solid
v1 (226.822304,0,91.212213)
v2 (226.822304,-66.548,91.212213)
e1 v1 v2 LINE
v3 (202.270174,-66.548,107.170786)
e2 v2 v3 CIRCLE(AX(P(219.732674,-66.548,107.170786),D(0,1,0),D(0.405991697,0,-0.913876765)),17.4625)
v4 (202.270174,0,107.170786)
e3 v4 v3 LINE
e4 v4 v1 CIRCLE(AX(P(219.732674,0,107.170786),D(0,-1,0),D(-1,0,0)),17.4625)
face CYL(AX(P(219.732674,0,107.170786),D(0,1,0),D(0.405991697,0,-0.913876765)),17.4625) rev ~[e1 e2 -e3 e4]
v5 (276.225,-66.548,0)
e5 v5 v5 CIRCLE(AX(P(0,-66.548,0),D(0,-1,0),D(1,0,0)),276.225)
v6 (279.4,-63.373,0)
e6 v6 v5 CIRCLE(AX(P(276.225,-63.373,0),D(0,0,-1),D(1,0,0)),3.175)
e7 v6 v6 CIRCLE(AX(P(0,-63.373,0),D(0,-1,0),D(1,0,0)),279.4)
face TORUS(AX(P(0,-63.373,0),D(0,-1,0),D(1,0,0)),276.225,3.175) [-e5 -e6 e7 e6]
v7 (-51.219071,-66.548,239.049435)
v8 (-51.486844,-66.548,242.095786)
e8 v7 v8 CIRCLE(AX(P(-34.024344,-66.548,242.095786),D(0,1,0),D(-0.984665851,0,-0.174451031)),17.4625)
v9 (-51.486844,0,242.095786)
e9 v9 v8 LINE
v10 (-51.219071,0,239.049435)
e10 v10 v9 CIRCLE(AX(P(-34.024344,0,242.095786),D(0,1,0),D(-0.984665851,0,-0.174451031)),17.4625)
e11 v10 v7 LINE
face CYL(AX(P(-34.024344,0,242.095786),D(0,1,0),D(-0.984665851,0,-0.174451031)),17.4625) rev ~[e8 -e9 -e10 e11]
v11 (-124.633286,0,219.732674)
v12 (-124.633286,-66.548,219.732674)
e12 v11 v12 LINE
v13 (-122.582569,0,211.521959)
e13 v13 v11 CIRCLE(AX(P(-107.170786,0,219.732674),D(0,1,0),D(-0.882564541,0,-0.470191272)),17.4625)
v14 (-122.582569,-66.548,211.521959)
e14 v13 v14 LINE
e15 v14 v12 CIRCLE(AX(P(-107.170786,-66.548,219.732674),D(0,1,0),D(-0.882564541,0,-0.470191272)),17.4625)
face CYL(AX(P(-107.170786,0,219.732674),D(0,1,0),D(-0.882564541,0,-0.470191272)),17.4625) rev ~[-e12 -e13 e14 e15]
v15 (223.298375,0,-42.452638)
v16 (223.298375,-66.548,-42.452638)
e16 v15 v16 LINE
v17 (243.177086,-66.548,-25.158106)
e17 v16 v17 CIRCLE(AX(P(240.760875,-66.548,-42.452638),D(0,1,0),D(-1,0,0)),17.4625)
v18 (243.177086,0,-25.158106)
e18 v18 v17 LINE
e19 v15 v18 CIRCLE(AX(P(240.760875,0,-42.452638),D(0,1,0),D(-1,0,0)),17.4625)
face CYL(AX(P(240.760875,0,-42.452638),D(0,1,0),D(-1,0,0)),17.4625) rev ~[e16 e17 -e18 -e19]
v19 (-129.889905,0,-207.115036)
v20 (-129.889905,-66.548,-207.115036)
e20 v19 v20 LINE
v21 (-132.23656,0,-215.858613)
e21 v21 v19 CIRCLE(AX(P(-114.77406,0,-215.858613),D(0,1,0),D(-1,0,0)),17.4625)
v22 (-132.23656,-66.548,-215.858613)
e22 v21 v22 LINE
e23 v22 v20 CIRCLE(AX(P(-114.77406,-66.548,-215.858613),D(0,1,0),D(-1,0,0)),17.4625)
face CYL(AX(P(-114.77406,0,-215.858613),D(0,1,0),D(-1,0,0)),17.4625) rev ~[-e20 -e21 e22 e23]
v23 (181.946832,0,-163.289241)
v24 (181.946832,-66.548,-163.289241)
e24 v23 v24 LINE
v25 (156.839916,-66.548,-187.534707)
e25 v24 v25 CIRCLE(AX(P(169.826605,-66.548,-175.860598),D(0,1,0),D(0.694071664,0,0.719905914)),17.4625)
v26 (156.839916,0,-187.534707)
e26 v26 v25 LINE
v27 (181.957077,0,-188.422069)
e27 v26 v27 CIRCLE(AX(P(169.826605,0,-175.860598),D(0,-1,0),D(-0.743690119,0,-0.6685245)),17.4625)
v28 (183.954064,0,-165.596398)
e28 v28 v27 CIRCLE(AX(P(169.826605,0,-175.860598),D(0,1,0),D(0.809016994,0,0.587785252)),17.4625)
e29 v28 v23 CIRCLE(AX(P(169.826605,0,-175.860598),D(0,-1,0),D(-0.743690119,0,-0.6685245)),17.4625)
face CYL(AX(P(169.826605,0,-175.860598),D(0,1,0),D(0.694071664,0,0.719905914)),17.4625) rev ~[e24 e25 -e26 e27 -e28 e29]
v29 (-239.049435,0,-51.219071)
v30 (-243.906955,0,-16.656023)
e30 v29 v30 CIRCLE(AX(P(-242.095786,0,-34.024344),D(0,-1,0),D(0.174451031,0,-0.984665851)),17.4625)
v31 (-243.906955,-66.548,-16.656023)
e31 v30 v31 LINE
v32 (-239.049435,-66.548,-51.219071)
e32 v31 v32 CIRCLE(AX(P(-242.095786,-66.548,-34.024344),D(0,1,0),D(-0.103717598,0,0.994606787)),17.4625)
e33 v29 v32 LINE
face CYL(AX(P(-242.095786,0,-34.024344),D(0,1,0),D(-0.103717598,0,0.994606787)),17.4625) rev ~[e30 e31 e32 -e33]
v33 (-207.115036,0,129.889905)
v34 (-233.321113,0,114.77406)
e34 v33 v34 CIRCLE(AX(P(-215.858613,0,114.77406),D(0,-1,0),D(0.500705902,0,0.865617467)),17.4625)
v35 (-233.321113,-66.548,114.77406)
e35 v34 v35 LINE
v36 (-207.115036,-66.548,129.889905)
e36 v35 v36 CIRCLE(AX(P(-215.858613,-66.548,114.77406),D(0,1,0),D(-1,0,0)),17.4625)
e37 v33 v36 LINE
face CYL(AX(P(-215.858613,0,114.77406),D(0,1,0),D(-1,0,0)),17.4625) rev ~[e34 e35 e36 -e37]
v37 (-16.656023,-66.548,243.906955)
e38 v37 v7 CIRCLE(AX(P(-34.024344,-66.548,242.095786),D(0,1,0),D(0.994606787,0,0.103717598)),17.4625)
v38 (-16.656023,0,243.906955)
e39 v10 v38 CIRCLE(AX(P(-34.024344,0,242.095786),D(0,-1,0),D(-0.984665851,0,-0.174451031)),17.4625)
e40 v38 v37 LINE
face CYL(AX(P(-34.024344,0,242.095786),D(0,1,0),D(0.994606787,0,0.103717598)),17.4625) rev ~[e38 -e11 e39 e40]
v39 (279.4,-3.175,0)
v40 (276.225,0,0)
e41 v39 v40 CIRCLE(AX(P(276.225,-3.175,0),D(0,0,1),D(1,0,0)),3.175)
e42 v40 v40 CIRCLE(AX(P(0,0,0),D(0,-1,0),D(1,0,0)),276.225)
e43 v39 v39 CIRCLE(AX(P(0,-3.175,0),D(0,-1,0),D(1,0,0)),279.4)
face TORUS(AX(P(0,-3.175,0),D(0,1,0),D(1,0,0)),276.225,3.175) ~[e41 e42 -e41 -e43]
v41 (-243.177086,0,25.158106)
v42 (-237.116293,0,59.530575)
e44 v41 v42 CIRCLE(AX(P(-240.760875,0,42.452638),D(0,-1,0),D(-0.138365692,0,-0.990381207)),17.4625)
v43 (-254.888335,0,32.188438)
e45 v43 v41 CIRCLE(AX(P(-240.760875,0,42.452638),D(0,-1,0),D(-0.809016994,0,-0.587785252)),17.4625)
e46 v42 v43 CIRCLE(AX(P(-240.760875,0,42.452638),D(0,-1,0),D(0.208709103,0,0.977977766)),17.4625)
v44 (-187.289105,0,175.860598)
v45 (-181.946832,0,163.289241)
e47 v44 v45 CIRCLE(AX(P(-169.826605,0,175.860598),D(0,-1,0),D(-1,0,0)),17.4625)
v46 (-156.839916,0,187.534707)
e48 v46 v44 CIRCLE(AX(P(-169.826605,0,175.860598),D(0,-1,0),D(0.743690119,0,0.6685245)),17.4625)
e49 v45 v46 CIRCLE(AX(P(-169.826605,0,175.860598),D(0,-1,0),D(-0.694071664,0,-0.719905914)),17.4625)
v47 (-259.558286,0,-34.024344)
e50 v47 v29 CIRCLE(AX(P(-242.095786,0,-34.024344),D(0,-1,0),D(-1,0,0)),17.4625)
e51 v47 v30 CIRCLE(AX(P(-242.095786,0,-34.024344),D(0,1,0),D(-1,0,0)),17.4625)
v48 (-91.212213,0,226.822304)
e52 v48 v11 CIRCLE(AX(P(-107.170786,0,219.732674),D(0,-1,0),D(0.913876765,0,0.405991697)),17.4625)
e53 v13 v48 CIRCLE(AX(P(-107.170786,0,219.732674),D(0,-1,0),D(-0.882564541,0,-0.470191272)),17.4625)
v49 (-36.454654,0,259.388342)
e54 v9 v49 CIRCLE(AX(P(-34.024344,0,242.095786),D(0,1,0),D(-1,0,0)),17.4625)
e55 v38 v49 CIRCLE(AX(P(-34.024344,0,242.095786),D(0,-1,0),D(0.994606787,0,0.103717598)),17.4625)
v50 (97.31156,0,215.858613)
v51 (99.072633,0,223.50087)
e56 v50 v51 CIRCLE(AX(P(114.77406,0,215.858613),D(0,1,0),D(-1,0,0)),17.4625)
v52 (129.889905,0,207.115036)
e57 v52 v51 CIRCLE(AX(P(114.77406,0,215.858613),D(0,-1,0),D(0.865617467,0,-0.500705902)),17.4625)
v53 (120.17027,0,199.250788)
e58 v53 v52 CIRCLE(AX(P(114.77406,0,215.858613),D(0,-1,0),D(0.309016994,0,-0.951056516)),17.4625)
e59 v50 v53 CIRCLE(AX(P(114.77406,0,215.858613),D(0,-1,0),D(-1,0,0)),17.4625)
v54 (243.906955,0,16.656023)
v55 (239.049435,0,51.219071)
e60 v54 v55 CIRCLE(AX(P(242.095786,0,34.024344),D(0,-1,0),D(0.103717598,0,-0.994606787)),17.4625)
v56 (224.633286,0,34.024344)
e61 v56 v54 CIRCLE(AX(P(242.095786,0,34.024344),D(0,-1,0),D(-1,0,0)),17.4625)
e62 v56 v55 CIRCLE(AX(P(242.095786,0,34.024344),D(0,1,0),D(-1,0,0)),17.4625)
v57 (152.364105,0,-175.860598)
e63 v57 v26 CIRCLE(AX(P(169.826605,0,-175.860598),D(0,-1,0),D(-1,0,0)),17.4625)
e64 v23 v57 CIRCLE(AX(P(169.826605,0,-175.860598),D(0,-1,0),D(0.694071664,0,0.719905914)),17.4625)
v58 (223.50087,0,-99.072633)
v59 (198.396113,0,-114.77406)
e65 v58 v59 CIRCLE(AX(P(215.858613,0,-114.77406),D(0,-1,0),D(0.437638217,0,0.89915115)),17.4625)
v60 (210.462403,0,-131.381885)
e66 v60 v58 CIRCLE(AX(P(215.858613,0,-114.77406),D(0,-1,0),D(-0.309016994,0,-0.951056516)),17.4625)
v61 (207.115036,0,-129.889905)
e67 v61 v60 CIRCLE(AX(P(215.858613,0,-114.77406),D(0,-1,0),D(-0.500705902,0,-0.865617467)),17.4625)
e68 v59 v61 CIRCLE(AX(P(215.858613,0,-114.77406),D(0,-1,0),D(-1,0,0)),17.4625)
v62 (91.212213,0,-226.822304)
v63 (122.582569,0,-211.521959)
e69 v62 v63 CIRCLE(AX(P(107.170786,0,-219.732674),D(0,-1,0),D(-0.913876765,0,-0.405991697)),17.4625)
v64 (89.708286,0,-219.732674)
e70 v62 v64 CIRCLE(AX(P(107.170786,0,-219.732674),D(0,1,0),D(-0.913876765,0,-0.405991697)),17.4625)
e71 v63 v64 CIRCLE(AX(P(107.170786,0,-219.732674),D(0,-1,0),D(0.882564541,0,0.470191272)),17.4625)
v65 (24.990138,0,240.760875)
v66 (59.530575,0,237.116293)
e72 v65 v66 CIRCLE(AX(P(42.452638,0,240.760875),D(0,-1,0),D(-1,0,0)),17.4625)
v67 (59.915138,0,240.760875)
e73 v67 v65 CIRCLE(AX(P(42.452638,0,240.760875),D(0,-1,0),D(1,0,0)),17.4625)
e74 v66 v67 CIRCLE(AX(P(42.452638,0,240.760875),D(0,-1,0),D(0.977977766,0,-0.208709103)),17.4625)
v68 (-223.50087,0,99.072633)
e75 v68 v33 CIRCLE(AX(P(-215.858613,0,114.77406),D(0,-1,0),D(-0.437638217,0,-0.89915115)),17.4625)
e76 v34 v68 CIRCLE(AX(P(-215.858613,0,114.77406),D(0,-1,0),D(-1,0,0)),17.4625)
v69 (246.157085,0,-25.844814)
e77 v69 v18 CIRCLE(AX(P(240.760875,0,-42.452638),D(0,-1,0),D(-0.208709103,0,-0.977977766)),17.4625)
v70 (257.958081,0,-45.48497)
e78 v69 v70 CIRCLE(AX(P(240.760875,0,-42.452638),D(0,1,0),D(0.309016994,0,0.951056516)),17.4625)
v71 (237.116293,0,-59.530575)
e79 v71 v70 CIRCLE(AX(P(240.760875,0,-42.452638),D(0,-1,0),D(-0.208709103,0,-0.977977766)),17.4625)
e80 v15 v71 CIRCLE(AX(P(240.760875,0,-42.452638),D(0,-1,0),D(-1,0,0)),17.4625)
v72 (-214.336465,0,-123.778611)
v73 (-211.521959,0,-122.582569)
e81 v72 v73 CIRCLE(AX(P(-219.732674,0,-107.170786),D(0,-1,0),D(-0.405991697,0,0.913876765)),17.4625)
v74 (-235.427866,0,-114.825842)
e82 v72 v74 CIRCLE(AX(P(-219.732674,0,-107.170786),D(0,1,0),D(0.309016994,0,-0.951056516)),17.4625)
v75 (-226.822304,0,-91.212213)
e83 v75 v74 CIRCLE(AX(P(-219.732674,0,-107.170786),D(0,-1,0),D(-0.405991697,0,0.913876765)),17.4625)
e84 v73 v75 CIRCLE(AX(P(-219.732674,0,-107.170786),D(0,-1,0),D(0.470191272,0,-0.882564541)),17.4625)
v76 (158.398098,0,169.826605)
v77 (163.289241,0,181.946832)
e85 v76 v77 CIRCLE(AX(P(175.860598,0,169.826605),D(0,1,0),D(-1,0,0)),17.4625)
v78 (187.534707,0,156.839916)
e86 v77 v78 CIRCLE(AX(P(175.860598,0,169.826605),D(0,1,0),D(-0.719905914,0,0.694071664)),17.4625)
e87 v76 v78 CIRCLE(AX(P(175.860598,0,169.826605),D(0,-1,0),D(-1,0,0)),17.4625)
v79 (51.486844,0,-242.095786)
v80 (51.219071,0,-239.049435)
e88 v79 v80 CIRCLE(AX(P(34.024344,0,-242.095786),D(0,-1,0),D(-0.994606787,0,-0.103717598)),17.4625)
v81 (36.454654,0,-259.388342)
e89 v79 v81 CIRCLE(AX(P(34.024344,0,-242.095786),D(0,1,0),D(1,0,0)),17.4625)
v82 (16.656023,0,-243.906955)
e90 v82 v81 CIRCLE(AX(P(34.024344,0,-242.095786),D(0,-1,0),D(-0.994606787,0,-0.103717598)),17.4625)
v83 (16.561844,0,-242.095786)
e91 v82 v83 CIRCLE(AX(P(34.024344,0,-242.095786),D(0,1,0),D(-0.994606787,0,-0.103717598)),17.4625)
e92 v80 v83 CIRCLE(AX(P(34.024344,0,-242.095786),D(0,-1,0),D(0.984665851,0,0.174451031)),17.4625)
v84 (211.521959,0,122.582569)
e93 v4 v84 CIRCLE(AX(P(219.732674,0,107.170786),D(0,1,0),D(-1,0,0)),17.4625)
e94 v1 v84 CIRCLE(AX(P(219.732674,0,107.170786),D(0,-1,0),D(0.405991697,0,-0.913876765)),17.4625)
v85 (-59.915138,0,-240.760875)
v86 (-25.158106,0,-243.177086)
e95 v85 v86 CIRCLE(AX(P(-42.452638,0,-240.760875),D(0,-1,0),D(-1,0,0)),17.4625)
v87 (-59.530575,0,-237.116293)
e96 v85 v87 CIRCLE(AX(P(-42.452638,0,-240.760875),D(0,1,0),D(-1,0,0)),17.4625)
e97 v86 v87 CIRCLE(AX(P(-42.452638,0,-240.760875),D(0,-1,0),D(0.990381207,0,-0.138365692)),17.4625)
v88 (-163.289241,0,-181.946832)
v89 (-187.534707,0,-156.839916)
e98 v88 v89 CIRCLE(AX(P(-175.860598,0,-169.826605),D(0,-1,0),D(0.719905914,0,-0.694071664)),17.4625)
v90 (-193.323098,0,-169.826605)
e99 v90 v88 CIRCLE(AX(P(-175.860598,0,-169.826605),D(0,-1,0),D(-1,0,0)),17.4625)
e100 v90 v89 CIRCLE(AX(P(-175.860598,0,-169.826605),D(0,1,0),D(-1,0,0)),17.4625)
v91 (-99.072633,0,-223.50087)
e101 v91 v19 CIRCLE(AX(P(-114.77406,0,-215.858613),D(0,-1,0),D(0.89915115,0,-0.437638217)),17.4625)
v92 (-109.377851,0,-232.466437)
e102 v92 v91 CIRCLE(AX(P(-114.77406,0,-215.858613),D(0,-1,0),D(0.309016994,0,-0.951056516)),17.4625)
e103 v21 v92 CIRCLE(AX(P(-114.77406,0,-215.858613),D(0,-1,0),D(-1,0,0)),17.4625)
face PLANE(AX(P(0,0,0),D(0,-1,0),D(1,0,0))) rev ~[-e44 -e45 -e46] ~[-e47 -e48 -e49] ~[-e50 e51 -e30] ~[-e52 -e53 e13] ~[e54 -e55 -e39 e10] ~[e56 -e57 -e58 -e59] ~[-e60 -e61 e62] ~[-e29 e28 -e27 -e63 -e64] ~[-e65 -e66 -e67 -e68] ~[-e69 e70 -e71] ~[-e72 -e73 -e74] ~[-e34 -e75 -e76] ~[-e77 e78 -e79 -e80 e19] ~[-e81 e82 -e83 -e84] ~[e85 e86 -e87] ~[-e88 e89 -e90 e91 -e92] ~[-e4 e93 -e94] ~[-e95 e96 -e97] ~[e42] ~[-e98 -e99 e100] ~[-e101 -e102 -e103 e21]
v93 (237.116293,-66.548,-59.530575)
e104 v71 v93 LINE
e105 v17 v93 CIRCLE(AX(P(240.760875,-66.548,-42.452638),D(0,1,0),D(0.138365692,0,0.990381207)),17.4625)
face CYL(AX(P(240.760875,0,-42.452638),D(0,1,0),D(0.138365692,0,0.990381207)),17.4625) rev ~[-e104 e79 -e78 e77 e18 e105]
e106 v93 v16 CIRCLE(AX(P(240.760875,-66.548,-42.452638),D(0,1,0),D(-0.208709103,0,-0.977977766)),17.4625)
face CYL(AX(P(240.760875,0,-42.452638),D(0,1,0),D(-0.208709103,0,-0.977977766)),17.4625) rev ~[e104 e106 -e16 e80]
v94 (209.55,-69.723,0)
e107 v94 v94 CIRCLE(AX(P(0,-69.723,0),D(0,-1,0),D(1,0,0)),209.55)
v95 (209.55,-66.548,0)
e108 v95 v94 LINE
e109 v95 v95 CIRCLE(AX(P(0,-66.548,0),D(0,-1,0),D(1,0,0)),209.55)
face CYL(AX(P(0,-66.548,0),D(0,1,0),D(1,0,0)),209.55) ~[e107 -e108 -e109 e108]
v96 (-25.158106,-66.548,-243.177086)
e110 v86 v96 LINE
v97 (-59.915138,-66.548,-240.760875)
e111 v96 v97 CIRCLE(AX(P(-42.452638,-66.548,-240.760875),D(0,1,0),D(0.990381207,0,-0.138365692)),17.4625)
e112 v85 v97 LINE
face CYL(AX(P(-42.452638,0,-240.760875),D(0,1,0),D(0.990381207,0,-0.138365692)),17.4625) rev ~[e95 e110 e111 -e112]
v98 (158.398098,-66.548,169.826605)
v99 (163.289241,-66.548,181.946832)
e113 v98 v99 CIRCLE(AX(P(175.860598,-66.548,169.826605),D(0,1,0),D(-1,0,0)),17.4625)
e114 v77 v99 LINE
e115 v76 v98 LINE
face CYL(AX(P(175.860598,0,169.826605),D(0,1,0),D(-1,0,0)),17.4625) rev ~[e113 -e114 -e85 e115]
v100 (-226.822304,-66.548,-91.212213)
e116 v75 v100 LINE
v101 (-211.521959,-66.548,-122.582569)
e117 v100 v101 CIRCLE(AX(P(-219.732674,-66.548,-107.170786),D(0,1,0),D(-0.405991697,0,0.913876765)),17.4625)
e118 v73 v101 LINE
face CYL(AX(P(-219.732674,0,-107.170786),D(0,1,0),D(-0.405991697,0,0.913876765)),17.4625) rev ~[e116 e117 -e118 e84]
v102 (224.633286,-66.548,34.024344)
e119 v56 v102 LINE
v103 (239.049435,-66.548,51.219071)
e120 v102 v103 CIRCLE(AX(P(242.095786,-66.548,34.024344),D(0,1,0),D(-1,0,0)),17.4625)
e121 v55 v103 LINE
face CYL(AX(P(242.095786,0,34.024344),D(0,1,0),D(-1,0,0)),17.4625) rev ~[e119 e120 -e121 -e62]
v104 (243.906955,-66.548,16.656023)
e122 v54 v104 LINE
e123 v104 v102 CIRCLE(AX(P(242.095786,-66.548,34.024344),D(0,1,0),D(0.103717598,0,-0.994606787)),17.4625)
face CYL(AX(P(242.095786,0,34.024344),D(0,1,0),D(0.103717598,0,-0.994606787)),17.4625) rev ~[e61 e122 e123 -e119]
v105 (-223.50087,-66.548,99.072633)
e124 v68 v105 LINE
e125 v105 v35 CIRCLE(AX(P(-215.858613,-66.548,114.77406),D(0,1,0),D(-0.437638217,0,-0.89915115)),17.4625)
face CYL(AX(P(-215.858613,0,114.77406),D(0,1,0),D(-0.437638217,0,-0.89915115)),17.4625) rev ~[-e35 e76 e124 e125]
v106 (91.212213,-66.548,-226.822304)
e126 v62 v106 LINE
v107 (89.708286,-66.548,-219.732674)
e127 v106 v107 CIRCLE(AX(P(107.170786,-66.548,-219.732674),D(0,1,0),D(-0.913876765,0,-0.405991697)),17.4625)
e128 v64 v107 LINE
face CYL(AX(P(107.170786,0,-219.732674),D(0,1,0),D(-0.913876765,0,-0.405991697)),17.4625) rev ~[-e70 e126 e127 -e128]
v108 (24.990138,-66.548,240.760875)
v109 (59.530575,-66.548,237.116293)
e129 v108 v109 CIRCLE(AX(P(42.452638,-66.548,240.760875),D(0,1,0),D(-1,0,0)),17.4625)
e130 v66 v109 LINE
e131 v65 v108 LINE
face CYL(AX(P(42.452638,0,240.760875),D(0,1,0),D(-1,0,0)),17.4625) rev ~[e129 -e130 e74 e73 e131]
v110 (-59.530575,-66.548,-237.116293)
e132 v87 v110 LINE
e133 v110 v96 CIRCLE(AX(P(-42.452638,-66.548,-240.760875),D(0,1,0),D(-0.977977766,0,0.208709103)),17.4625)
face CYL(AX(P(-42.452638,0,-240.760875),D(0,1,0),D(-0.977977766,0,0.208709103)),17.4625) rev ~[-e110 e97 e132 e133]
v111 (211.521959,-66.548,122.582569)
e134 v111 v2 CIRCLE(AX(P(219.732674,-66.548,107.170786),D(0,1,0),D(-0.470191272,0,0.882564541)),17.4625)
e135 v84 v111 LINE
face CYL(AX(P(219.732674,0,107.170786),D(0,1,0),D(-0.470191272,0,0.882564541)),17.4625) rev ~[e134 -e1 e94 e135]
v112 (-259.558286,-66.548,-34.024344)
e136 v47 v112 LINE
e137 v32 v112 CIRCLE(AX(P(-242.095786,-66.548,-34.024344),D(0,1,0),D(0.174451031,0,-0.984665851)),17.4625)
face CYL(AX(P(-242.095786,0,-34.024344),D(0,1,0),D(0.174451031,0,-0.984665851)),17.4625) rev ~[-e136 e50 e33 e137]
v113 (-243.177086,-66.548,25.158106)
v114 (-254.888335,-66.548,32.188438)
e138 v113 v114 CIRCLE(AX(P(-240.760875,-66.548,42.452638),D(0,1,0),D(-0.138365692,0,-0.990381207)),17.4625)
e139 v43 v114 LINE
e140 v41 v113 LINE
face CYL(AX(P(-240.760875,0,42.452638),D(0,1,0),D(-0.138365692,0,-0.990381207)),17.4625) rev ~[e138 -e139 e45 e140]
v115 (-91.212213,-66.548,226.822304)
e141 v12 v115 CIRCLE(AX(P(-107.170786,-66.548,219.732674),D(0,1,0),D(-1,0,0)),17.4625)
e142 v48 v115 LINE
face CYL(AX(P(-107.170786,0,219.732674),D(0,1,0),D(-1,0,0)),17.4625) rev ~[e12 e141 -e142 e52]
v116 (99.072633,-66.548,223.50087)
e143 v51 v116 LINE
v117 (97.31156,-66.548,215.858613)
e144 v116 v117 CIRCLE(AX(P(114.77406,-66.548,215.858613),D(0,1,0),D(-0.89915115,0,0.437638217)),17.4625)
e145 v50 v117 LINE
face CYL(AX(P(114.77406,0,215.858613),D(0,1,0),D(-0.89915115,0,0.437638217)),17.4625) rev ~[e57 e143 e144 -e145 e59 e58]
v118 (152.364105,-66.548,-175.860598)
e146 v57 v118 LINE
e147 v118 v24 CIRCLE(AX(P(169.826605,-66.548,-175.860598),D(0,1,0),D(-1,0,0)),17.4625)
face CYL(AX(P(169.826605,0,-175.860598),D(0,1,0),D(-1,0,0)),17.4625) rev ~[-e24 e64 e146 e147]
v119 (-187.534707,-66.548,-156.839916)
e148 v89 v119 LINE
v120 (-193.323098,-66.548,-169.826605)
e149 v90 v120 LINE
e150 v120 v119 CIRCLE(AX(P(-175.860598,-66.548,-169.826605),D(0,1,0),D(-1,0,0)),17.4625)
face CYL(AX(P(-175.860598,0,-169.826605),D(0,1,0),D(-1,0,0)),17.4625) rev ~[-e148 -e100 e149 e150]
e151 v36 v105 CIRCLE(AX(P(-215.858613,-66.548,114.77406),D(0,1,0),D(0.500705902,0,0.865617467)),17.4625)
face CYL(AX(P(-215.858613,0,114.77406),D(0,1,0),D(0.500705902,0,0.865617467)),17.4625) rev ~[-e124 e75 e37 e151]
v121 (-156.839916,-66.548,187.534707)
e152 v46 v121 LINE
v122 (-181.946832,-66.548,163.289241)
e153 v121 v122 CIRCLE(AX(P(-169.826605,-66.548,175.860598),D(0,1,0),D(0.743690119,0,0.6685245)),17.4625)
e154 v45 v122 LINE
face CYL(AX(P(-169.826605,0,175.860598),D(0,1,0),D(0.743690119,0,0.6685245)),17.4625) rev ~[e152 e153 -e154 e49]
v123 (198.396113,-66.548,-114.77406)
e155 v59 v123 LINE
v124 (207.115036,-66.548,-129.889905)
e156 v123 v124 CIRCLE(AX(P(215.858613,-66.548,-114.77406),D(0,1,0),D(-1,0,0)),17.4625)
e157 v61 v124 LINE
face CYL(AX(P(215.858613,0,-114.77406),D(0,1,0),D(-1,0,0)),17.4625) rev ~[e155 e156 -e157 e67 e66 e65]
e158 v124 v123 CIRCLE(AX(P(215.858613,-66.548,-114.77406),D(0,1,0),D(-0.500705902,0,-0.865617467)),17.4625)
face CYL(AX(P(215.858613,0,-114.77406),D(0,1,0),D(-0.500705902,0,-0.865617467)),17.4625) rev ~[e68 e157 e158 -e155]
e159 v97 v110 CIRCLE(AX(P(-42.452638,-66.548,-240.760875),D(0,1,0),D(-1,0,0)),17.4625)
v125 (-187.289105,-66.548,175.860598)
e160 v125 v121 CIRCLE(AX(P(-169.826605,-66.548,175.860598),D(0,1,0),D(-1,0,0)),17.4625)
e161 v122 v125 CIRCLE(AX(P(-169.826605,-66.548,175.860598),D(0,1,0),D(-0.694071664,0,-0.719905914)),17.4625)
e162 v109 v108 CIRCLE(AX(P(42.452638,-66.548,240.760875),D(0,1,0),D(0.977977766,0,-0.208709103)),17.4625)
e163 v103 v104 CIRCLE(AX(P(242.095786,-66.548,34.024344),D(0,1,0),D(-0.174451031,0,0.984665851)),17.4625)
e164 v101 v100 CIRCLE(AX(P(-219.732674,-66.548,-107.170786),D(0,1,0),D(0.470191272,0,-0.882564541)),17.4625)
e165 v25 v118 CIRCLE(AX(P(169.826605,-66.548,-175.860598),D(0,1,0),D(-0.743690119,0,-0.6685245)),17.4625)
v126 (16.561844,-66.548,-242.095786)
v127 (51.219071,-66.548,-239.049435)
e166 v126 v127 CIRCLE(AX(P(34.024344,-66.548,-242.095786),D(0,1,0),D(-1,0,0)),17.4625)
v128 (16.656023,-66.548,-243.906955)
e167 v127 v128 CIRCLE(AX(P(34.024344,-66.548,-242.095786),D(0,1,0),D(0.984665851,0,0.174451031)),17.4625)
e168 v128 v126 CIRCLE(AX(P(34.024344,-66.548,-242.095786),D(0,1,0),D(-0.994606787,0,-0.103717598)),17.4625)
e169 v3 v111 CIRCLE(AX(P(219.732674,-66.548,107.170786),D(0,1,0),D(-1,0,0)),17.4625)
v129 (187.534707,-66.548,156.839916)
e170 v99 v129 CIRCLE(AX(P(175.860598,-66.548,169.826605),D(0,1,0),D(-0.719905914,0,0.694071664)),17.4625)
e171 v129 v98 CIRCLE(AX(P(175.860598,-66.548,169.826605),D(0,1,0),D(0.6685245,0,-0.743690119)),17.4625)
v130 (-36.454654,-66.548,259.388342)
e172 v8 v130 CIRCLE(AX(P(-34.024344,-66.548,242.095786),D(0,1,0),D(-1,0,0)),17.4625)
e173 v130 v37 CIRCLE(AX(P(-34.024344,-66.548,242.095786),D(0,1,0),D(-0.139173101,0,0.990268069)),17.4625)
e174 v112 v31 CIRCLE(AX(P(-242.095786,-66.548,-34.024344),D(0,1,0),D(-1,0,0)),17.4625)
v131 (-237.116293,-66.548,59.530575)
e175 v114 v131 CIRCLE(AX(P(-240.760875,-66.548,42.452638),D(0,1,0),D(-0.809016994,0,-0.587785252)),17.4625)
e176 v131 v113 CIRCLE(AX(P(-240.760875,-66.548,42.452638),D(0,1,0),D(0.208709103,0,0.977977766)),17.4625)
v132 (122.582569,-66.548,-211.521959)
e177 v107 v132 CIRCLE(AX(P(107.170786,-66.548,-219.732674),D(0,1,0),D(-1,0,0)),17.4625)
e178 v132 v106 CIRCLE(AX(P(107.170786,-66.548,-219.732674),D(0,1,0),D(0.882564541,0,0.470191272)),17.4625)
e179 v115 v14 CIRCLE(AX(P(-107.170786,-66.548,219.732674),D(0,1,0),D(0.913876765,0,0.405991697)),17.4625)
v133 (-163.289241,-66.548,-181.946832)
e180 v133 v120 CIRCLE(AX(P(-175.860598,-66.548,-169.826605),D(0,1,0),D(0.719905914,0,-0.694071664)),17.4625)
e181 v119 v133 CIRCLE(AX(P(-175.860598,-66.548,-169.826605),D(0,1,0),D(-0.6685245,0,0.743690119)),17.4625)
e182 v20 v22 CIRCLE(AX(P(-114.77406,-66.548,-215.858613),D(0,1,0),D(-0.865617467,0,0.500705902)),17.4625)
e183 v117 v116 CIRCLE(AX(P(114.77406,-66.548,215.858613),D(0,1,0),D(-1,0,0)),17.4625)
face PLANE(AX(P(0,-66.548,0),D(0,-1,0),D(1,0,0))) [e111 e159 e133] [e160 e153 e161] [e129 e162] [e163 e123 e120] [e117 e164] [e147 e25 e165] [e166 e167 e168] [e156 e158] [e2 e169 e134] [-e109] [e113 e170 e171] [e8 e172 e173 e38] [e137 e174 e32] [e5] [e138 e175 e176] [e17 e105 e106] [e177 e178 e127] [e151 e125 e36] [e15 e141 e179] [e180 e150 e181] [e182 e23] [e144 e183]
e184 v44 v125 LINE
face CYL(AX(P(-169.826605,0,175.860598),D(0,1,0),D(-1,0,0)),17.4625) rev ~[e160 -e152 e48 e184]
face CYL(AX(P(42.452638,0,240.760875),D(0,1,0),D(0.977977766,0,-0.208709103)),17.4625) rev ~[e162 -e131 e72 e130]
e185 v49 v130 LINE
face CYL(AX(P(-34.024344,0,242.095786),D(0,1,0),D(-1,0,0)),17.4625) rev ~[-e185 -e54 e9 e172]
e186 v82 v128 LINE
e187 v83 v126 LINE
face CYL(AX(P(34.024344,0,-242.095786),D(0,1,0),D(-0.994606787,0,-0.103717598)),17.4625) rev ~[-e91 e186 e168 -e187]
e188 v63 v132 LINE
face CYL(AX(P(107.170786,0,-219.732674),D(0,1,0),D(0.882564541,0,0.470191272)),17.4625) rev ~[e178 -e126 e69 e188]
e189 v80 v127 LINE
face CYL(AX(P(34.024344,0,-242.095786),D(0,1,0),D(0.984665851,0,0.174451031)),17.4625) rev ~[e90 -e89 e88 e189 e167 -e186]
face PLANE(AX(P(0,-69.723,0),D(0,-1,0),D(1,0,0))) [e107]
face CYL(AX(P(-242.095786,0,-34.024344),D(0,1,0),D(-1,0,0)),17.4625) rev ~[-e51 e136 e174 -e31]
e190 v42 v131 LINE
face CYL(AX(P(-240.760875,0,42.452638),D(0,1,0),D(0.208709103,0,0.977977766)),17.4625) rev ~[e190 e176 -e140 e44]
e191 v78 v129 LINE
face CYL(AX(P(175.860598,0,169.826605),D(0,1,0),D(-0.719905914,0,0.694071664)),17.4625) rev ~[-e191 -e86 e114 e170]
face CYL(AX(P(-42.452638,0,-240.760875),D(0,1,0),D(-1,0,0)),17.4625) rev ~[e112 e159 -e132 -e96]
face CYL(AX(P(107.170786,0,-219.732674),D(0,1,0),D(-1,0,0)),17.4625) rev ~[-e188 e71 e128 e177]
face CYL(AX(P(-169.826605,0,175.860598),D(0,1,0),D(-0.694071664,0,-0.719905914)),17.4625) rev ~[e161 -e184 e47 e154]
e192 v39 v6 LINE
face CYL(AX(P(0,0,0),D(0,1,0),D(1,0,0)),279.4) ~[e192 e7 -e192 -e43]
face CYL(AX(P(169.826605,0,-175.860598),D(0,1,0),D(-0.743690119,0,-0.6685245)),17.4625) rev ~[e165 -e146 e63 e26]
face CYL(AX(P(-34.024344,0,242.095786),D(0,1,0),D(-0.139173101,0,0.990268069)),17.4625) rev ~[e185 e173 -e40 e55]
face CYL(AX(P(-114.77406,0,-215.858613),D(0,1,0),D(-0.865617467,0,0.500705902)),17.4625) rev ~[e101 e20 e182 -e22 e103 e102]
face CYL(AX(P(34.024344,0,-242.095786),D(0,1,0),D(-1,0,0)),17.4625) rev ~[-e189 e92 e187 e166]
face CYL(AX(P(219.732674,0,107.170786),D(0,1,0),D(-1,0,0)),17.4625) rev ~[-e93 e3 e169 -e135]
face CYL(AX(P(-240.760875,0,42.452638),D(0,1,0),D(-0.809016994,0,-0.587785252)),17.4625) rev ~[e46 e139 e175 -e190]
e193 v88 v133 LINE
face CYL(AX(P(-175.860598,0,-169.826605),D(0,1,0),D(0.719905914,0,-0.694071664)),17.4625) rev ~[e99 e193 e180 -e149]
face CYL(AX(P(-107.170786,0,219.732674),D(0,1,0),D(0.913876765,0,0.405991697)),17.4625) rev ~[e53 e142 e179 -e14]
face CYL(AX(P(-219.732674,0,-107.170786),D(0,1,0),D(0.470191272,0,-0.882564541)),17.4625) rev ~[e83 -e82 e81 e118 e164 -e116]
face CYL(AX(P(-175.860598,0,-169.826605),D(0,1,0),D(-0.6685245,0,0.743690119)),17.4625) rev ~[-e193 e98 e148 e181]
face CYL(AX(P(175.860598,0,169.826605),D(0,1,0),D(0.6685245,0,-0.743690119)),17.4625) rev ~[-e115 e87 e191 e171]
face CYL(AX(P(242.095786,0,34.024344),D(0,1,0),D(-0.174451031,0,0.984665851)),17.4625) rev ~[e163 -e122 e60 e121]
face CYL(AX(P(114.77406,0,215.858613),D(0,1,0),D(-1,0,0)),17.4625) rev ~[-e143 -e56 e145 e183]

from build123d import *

# Parameters (mm, degrees)
F0_R            = 279.4
F1_DEPTH        = 66.548
F2_R            = 3.175
F3_R            = 209.55
F4_DEPTH        = 3.175
F6_DEPTH        = 76.2
F6_COPIES_COUNT = 8
F6_COPIES_ANGLE = 252


# Not quite as in the source:
# - a pattern or mirror of a feature is missing from the dataset's text; its kind, count and spacing are read off the source's solid


with BuildPart() as f1:
    # F0 (on Front) → F1 (new body)
    with BuildSketch(Plane.XZ):
        Circle(F0_R)
    extrude(amount=F1_DEPTH)

    # F2
    f2_edges = [f1.edges().sort_by_distance(p)[0] for p in [
        (-279.4, -66.548, 0),
        (-279.4, 0, 0),
    ]]
    fillet(f2_edges, radius=F2_R)

    # F3 (on face) → F4 (join)
    with BuildSketch(Plane.XZ.offset(66.548)):
        Circle(F3_R)
    extrude(amount=F4_DEPTH)

    # F5 (on face) → F6 (cut)
    with BuildSketch(Plane(origin=(0, 0, 0), x_dir=(-1, 0, 0), z_dir=(0, 1, 0))):
        with BuildLine():
            ThreePointArc((259.5582861056, -34.0243438572), (255.0681882926, -22.3343614899), (243.9069546527, -16.6560228461))
            ThreePointArc((243.9069546527, -16.6560228461), (242.0957861056, -34.0243438572), (239.0494349763, -51.2190712772))
            ThreePointArc((239.0494349763, -51.2190712772), (253.31501067, -47.405969559), (259.5582861056, -34.0243438572))
        make_face()
        with BuildLine():
            ThreePointArc((239.0494349763, -51.2190712772), (242.0957861056, -34.0243438572), (243.9069546527, -16.6560228461))
            ThreePointArc((243.9069546527, -16.6560228461), (224.8032299552, -31.5940335817), (239.0494349763, -51.2190712772))
        make_face()
        with BuildLine():
            ThreePointArc((207.1150359511, 129.8899053352), (200.4401404239, 106.5759131469), (223.5008701244, 99.0726333486))
            ThreePointArc((223.5008701244, 99.0726333486), (215.8586127642, 114.7740603121), (207.1150359511, 129.8899053352))
        make_face()
        with BuildLine():
            ThreePointArc((207.1150359511, 129.8899053352), (215.8586127642, 114.7740603121), (223.5008701244, 99.0726333486))
            ThreePointArc((223.5008701244, 99.0726333486), (230.6638791482, 105.5143090439), (233.3211127642, 114.7740603121))
            ThreePointArc((233.3211127642, 114.7740603121), (224.5836971807, 129.9005869515), (207.1150359511, 129.8899053352))
        make_face()
        with BuildLine():
            ThreePointArc((237.195174469, -107.1707861113), (234.3740809966, -97.6540576217), (226.822304474, -91.2122130973))
            ThreePointArc((226.822304474, -91.2122130973), (219.732674469, -107.1707861113), (211.5219593902, -122.5825694002))
            ThreePointArc((211.5219593902, -122.5825694002), (228.7204243038, -122.142735188), (237.195174469, -107.1707861113))
        make_face()
        with BuildLine():
            ThreePointArc((211.5219593902, -122.5825694002), (219.732674469, -107.1707861113), (226.822304474, -91.2122130973))
            ThreePointArc((226.822304474, -91.2122130973), (204.0374834355, -99.5157299605), (211.5219593902, -122.5825694002))
        make_face()
        with BuildLine():
            ThreePointArc((156.8399164176, 187.5347067695), (157.6961333238, 163.2991264244), (181.9468315473, 163.2892406587))
            ThreePointArc((181.9468315473, 163.2892406587), (169.826605118, 175.8605976878), (156.8399164176, 187.5347067695))
        make_face()
        with BuildLine():
            ThreePointArc((156.8399164176, 187.5347067695), (169.826605118, 175.8605976878), (181.9468315473, 163.2892406587))
            ThreePointArc((181.9468315473, 163.2892406587), (185.8981383409, 169.03090325), (187.289105118, 175.8605976878))
            ThreePointArc((187.289105118, 175.8605976878), (176.0779591641, 192.1657955964), (156.8399164176, 187.5347067695))
        make_face()
        with BuildLine():
            ThreePointArc((193.3230976878, -169.826605118), (191.8104885352, -162.7174639458), (187.5347067695, -156.8399164176))
            ThreePointArc((187.5347067695, -156.8399164176), (175.8605976878, -169.826605118), (163.2892406587, -181.9468315473))
            ThreePointArc((163.2892406587, -181.9468315473), (182.3955645634, -186.0202184944), (193.3230976878, -169.826605118))
        make_face()
        with BuildLine():
            ThreePointArc((163.2892406587, -181.9468315473), (175.8605976878, -169.826605118), (187.5347067695, -156.8399164176))
            ThreePointArc((187.5347067695, -156.8399164176), (163.2991264244, -157.6961333238), (163.2892406587, -181.9468315473))
        make_face()
        with BuildLine():
            ThreePointArc((91.2122130973, 226.822304474), (99.5157299605, 204.0374834355), (122.5825694002, 211.5219593902))
            ThreePointArc((122.5825694002, 211.5219593902), (107.1707861113, 219.732674469), (91.2122130973, 226.822304474))
        make_face()
        with BuildLine():
            ThreePointArc((91.2122130973, 226.822304474), (107.1707861113, 219.732674469), (122.5825694002, 211.5219593902))
            ThreePointArc((122.5825694002, 211.5219593902), (124.1128516868, 215.501206605), (124.6332861113, 219.732674469))
            ThreePointArc((124.6332861113, 219.732674469), (110.7944807034, 236.8150555604), (91.2122130973, 226.822304474))
        make_face()
        with BuildLine():
            ThreePointArc((132.2365603121, -215.8586127642), (131.639696232, -211.332109559), (129.8899053352, -207.1150359511))
            ThreePointArc((129.8899053352, -207.1150359511), (114.7740603121, -215.8586127642), (99.0726333486, -223.5008701244))
            ThreePointArc((99.0726333486, -223.5008701244), (118.6953316557, -232.8751499354), (132.2365603121, -215.8586127642))
        make_face()
        with BuildLine():
            ThreePointArc((99.0726333486, -223.5008701244), (114.7740603121, -215.8586127642), (129.8899053352, -207.1150359511))
            ThreePointArc((129.8899053352, -207.1150359511), (106.5759131469, -200.4401404239), (99.0726333486, -223.5008701244))
        make_face()
        with BuildLine():
            ThreePointArc((31.5940335817, 224.8032299552), (44.2827839326, 227.9641438277), (51.2190712772, 239.0494349763))
            ThreePointArc((51.2190712772, 239.0494349763), (42.6489158097, 240.7261838796), (34.0243438572, 242.0957861056))
            Line((34.0243438572, 242.0957861056), (31.5940335817, 224.8032299552))
        make_face()
        with BuildLine():
            ThreePointArc((34.0243438572, 242.0957861056), (42.6489158097, 240.7261838796), (51.2190712772, 239.0494349763))
            ThreePointArc((51.2190712772, 239.0494349763), (51.4197719034, 240.5667375977), (51.4868438572, 242.0957861056))
            ThreePointArc((51.4868438572, 242.0957861056), (47.2034599019, 253.5522168993), (36.4546541327, 259.388342256))
            Line((36.4546541327, 259.388342256), (34.0243438572, 242.0957861056))
        make_face()
        with BuildLine():
            ThreePointArc((59.9151382351, -240.7608754177), (59.8187312974, -238.9284677109), (59.5305749705, -237.1162927103))
            ThreePointArc((59.5305749705, -237.1162927103), (42.4526382351, -240.7608754177), (25.1581064067, -243.1770863117))
            ThreePointArc((25.1581064067, -243.1770863117), (43.6636593323, -258.1813327639), (59.9151382351, -240.7608754177))
        make_face()
        with BuildLine():
            ThreePointArc((25.1581064067, -243.1770863117), (42.4526382351, -240.7608754177), (59.5305749705, -237.1162927103))
            ThreePointArc((59.5305749705, -237.1162927103), (39.4203069326, -223.5636700307), (25.1581064067, -243.1770863117))
        make_face()
        with BuildLine():
            Line((31.5940335817, 224.8032299552), (34.0243438572, 242.0957861056))
            ThreePointArc((34.0243438572, 242.0957861056), (25.3563596593, 243.1564941552), (16.6560228461, 243.9069546527))
            ThreePointArc((16.6560228461, 243.9069546527), (20.2680898419, 231.3391889803), (31.5940335817, 224.8032299552))
        make_face()
        with BuildLine():
            ThreePointArc((16.6560228461, 243.9069546527), (25.3563596593, 243.1564941552), (34.0243438572, 242.0957861056))
            Line((34.0243438572, 242.0957861056), (36.4546541327, 259.388342256))
            ThreePointArc((36.4546541327, 259.388342256), (23.267746732, 255.852040121), (16.6560228461, 243.9069546527))
        make_face()
        with BuildLine():
            ThreePointArc((-51.2190712772, -239.0494349763), (-36.4546541327, -259.388342256), (-16.6560228461, -243.9069546527))
            ThreePointArc((-16.6560228461, -243.9069546527), (-34.0243438572, -242.0957861056), (-51.2190712772, -239.0494349763))
        make_face()
        with BuildLine():
            ThreePointArc((-51.2190712772, -239.0494349763), (-34.0243438572, -242.0957861056), (-16.6560228461, -243.9069546527))
            ThreePointArc((-16.6560228461, -243.9069546527), (-16.5854044986, -243.0025938564), (-16.5618438572, -242.0957861056))
            ThreePointArc((-16.5618438572, -242.0957861056), (-32.4952953494, -224.7003580594), (-51.2190712772, -239.0494349763))
        make_face()
        with BuildLine():
            ThreePointArc((-24.9901382351, 240.7608754177), (-25.0321808889, 241.9718965148), (-25.1581064067, 243.1770863117))
            ThreePointArc((-25.1581064067, 243.1770863117), (-42.4526382351, 240.7608754177), (-59.5305749705, 237.1162927103))
            ThreePointArc((-59.5305749705, 237.1162927103), (-40.6202305284, 223.3947823554), (-24.9901382351, 240.7608754177))
        make_face()
        with BuildLine():
            ThreePointArc((-59.5305749705, 237.1162927103), (-42.4526382351, 240.7608754177), (-25.1581064067, 243.1770863117))
            ThreePointArc((-25.1581064067, 243.1770863117), (-45.4849695376, 257.9580808046), (-59.5305749705, 237.1162927103))
        make_face()
        with BuildLine():
            ThreePointArc((-122.5825694002, -211.5219593902), (-114.8258422621, -235.4278655025), (-91.2122130973, -226.822304474))
            ThreePointArc((-91.2122130973, -226.822304474), (-107.1707861113, -219.732674469), (-122.5825694002, -211.5219593902))
        make_face()
        with BuildLine():
            ThreePointArc((-122.5825694002, -211.5219593902), (-107.1707861113, -219.732674469), (-91.2122130973, -226.822304474))
            ThreePointArc((-91.2122130973, -226.822304474), (-90.0884050198, -223.3563690611), (-89.7082861113, -219.732674469))
            ThreePointArc((-89.7082861113, -219.732674469), (-102.9393182473, -202.7906088934), (-122.5825694002, -211.5219593902))
        make_face()
        with BuildLine():
            ThreePointArc((-97.3115603121, 215.8586127642), (-97.7575231408, 219.7798841078), (-99.0726333486, 223.5008701244))
            ThreePointArc((-99.0726333486, 223.5008701244), (-114.7740603121, 215.8586127642), (-129.8899053352, 207.1150359511))
            ThreePointArc((-129.8899053352, 207.1150359511), (-110.2475571069, 198.9929768443), (-97.3115603121, 215.8586127642))
        make_face()
        with BuildLine():
            ThreePointArc((-129.8899053352, 207.1150359511), (-114.7740603121, 215.8586127642), (-99.0726333486, 223.5008701244))
            ThreePointArc((-99.0726333486, 223.5008701244), (-122.9722074772, 231.2770851045), (-129.8899053352, 207.1150359511))
        make_face()
        with BuildLine():
            ThreePointArc((-181.9468315473, -163.2892406587), (-181.9570769121, -188.4220689512), (-156.8399164176, -187.5347067695))
            ThreePointArc((-156.8399164176, -187.5347067695), (-169.826605118, -175.8605976878), (-181.9468315473, -163.2892406587))
        make_face()
        with BuildLine():
            ThreePointArc((-181.9468315473, -163.2892406587), (-169.826605118, -175.8605976878), (-156.8399164176, -187.5347067695))
            ThreePointArc((-156.8399164176, -187.5347067695), (-153.5214072093, -182.1119517339), (-152.364105118, -175.8605976878))
            ThreePointArc((-152.364105118, -175.8605976878), (-162.9969106801, -159.7890644649), (-181.9468315473, -163.2892406587))
        make_face()
        with BuildLine():
            ThreePointArc((-158.3980976878, 169.826605118), (-159.6669843114, 176.3615719936), (-163.2892406587, 181.9468315473))
            ThreePointArc((-163.2892406587, 181.9468315473), (-175.8605976878, 169.826605118), (-187.5347067695, 156.8399164176))
            ThreePointArc((-187.5347067695, 156.8399164176), (-168.7514565156, 153.8767142706), (-158.3980976878, 169.826605118))
        make_face()
        with BuildLine():
            ThreePointArc((-187.5347067695, 156.8399164176), (-175.8605976878, 169.826605118), (-163.2892406587, 181.9468315473))
            ThreePointArc((-163.2892406587, 181.9468315473), (-188.4220689512, 181.9570769121), (-187.5347067695, 156.8399164176))
        make_face()
        with BuildLine():
            ThreePointArc((-223.5008701244, -99.0726333486), (-231.2770851045, -122.9722074772), (-207.1150359511, -129.8899053352))
            ThreePointArc((-207.1150359511, -129.8899053352), (-215.8586127642, -114.7740603121), (-223.5008701244, -99.0726333486))
        make_face()
        with BuildLine():
            ThreePointArc((-223.5008701244, -99.0726333486), (-215.8586127642, -114.7740603121), (-207.1150359511, -129.8899053352))
            ThreePointArc((-207.1150359511, -129.8899053352), (-200.7320861247, -123.4991447286), (-198.3961127642, -114.7740603121))
            ThreePointArc((-198.3961127642, -114.7740603121), (-206.598861496, -99.9687939281), (-223.5008701244, -99.0726333486))
        make_face()
        with BuildLine():
            ThreePointArc((-202.270174469, 107.1707861113), (-204.7607253922, 116.1585359461), (-211.5219593902, 122.5825694002))
            ThreePointArc((-211.5219593902, 122.5825694002), (-219.732674469, 107.1707861113), (-226.822304474, 91.2122130973))
            ThreePointArc((-226.822304474, 91.2122130973), (-210.2159459794, 92.5293795837), (-202.270174469, 107.1707861113))
        make_face()
        with BuildLine():
            ThreePointArc((-226.822304474, 91.2122130973), (-219.732674469, 107.1707861113), (-211.5219593902, 122.5825694002))
            ThreePointArc((-211.5219593902, 122.5825694002), (-235.4278655025, 114.8258422621), (-226.822304474, 91.2122130973))
        make_face()
        with BuildLine():
            ThreePointArc((-243.1770863117, -25.1581064067), (-257.9580808046, -45.4849695376), (-237.1162927103, -59.5305749705))
            ThreePointArc((-237.1162927103, -59.5305749705), (-240.7608754177, -42.4526382351), (-243.1770863117, -25.1581064067))
        make_face()
        with BuildLine():
            ThreePointArc((-243.1770863117, -25.1581064067), (-240.7608754177, -42.4526382351), (-237.1162927103, -59.5305749705))
            ThreePointArc((-237.1162927103, -59.5305749705), (-227.1854853353, -53.4366124868), (-223.2983754177, -42.4526382351))
            ThreePointArc((-223.2983754177, -42.4526382351), (-229.2990731267, -29.2781934843), (-243.1770863117, -25.1581064067))
        make_face()
        with BuildLine():
            ThreePointArc((-224.6332861056, 34.0243438572), (-228.7141604038, 45.2435684217), (-239.0494349763, 51.2190712772))
            ThreePointArc((-239.0494349763, 51.2190712772), (-242.0957861056, 34.0243438572), (-243.9069546527, 16.6560228461))
            ThreePointArc((-243.9069546527, 16.6560228461), (-230.4058037383, 21.0519416702), (-224.6332861056, 34.0243438572))
        make_face()
        with BuildLine():
            ThreePointArc((-243.9069546527, 16.6560228461), (-242.0957861056, 34.0243438572), (-239.0494349763, 51.2190712772))
            ThreePointArc((-239.0494349763, 51.2190712772), (-259.388342256, 36.4546541327), (-243.9069546527, 16.6560228461))
        make_face()
    f6 = extrude(amount=-F6_DEPTH, mode=Mode.SUBTRACT)

    # F6_copies: F6 ×8 about axis
    f6_copies_axis = Axis((0, 0, 0), (0, -1, 0))
    for i in range(1, F6_COPIES_COUNT):
        add(f6.rotate(f6_copies_axis, i * F6_COPIES_ANGLE / (F6_COPIES_COUNT - 1)), mode=Mode.SUBTRACT)


solid = f1.part
